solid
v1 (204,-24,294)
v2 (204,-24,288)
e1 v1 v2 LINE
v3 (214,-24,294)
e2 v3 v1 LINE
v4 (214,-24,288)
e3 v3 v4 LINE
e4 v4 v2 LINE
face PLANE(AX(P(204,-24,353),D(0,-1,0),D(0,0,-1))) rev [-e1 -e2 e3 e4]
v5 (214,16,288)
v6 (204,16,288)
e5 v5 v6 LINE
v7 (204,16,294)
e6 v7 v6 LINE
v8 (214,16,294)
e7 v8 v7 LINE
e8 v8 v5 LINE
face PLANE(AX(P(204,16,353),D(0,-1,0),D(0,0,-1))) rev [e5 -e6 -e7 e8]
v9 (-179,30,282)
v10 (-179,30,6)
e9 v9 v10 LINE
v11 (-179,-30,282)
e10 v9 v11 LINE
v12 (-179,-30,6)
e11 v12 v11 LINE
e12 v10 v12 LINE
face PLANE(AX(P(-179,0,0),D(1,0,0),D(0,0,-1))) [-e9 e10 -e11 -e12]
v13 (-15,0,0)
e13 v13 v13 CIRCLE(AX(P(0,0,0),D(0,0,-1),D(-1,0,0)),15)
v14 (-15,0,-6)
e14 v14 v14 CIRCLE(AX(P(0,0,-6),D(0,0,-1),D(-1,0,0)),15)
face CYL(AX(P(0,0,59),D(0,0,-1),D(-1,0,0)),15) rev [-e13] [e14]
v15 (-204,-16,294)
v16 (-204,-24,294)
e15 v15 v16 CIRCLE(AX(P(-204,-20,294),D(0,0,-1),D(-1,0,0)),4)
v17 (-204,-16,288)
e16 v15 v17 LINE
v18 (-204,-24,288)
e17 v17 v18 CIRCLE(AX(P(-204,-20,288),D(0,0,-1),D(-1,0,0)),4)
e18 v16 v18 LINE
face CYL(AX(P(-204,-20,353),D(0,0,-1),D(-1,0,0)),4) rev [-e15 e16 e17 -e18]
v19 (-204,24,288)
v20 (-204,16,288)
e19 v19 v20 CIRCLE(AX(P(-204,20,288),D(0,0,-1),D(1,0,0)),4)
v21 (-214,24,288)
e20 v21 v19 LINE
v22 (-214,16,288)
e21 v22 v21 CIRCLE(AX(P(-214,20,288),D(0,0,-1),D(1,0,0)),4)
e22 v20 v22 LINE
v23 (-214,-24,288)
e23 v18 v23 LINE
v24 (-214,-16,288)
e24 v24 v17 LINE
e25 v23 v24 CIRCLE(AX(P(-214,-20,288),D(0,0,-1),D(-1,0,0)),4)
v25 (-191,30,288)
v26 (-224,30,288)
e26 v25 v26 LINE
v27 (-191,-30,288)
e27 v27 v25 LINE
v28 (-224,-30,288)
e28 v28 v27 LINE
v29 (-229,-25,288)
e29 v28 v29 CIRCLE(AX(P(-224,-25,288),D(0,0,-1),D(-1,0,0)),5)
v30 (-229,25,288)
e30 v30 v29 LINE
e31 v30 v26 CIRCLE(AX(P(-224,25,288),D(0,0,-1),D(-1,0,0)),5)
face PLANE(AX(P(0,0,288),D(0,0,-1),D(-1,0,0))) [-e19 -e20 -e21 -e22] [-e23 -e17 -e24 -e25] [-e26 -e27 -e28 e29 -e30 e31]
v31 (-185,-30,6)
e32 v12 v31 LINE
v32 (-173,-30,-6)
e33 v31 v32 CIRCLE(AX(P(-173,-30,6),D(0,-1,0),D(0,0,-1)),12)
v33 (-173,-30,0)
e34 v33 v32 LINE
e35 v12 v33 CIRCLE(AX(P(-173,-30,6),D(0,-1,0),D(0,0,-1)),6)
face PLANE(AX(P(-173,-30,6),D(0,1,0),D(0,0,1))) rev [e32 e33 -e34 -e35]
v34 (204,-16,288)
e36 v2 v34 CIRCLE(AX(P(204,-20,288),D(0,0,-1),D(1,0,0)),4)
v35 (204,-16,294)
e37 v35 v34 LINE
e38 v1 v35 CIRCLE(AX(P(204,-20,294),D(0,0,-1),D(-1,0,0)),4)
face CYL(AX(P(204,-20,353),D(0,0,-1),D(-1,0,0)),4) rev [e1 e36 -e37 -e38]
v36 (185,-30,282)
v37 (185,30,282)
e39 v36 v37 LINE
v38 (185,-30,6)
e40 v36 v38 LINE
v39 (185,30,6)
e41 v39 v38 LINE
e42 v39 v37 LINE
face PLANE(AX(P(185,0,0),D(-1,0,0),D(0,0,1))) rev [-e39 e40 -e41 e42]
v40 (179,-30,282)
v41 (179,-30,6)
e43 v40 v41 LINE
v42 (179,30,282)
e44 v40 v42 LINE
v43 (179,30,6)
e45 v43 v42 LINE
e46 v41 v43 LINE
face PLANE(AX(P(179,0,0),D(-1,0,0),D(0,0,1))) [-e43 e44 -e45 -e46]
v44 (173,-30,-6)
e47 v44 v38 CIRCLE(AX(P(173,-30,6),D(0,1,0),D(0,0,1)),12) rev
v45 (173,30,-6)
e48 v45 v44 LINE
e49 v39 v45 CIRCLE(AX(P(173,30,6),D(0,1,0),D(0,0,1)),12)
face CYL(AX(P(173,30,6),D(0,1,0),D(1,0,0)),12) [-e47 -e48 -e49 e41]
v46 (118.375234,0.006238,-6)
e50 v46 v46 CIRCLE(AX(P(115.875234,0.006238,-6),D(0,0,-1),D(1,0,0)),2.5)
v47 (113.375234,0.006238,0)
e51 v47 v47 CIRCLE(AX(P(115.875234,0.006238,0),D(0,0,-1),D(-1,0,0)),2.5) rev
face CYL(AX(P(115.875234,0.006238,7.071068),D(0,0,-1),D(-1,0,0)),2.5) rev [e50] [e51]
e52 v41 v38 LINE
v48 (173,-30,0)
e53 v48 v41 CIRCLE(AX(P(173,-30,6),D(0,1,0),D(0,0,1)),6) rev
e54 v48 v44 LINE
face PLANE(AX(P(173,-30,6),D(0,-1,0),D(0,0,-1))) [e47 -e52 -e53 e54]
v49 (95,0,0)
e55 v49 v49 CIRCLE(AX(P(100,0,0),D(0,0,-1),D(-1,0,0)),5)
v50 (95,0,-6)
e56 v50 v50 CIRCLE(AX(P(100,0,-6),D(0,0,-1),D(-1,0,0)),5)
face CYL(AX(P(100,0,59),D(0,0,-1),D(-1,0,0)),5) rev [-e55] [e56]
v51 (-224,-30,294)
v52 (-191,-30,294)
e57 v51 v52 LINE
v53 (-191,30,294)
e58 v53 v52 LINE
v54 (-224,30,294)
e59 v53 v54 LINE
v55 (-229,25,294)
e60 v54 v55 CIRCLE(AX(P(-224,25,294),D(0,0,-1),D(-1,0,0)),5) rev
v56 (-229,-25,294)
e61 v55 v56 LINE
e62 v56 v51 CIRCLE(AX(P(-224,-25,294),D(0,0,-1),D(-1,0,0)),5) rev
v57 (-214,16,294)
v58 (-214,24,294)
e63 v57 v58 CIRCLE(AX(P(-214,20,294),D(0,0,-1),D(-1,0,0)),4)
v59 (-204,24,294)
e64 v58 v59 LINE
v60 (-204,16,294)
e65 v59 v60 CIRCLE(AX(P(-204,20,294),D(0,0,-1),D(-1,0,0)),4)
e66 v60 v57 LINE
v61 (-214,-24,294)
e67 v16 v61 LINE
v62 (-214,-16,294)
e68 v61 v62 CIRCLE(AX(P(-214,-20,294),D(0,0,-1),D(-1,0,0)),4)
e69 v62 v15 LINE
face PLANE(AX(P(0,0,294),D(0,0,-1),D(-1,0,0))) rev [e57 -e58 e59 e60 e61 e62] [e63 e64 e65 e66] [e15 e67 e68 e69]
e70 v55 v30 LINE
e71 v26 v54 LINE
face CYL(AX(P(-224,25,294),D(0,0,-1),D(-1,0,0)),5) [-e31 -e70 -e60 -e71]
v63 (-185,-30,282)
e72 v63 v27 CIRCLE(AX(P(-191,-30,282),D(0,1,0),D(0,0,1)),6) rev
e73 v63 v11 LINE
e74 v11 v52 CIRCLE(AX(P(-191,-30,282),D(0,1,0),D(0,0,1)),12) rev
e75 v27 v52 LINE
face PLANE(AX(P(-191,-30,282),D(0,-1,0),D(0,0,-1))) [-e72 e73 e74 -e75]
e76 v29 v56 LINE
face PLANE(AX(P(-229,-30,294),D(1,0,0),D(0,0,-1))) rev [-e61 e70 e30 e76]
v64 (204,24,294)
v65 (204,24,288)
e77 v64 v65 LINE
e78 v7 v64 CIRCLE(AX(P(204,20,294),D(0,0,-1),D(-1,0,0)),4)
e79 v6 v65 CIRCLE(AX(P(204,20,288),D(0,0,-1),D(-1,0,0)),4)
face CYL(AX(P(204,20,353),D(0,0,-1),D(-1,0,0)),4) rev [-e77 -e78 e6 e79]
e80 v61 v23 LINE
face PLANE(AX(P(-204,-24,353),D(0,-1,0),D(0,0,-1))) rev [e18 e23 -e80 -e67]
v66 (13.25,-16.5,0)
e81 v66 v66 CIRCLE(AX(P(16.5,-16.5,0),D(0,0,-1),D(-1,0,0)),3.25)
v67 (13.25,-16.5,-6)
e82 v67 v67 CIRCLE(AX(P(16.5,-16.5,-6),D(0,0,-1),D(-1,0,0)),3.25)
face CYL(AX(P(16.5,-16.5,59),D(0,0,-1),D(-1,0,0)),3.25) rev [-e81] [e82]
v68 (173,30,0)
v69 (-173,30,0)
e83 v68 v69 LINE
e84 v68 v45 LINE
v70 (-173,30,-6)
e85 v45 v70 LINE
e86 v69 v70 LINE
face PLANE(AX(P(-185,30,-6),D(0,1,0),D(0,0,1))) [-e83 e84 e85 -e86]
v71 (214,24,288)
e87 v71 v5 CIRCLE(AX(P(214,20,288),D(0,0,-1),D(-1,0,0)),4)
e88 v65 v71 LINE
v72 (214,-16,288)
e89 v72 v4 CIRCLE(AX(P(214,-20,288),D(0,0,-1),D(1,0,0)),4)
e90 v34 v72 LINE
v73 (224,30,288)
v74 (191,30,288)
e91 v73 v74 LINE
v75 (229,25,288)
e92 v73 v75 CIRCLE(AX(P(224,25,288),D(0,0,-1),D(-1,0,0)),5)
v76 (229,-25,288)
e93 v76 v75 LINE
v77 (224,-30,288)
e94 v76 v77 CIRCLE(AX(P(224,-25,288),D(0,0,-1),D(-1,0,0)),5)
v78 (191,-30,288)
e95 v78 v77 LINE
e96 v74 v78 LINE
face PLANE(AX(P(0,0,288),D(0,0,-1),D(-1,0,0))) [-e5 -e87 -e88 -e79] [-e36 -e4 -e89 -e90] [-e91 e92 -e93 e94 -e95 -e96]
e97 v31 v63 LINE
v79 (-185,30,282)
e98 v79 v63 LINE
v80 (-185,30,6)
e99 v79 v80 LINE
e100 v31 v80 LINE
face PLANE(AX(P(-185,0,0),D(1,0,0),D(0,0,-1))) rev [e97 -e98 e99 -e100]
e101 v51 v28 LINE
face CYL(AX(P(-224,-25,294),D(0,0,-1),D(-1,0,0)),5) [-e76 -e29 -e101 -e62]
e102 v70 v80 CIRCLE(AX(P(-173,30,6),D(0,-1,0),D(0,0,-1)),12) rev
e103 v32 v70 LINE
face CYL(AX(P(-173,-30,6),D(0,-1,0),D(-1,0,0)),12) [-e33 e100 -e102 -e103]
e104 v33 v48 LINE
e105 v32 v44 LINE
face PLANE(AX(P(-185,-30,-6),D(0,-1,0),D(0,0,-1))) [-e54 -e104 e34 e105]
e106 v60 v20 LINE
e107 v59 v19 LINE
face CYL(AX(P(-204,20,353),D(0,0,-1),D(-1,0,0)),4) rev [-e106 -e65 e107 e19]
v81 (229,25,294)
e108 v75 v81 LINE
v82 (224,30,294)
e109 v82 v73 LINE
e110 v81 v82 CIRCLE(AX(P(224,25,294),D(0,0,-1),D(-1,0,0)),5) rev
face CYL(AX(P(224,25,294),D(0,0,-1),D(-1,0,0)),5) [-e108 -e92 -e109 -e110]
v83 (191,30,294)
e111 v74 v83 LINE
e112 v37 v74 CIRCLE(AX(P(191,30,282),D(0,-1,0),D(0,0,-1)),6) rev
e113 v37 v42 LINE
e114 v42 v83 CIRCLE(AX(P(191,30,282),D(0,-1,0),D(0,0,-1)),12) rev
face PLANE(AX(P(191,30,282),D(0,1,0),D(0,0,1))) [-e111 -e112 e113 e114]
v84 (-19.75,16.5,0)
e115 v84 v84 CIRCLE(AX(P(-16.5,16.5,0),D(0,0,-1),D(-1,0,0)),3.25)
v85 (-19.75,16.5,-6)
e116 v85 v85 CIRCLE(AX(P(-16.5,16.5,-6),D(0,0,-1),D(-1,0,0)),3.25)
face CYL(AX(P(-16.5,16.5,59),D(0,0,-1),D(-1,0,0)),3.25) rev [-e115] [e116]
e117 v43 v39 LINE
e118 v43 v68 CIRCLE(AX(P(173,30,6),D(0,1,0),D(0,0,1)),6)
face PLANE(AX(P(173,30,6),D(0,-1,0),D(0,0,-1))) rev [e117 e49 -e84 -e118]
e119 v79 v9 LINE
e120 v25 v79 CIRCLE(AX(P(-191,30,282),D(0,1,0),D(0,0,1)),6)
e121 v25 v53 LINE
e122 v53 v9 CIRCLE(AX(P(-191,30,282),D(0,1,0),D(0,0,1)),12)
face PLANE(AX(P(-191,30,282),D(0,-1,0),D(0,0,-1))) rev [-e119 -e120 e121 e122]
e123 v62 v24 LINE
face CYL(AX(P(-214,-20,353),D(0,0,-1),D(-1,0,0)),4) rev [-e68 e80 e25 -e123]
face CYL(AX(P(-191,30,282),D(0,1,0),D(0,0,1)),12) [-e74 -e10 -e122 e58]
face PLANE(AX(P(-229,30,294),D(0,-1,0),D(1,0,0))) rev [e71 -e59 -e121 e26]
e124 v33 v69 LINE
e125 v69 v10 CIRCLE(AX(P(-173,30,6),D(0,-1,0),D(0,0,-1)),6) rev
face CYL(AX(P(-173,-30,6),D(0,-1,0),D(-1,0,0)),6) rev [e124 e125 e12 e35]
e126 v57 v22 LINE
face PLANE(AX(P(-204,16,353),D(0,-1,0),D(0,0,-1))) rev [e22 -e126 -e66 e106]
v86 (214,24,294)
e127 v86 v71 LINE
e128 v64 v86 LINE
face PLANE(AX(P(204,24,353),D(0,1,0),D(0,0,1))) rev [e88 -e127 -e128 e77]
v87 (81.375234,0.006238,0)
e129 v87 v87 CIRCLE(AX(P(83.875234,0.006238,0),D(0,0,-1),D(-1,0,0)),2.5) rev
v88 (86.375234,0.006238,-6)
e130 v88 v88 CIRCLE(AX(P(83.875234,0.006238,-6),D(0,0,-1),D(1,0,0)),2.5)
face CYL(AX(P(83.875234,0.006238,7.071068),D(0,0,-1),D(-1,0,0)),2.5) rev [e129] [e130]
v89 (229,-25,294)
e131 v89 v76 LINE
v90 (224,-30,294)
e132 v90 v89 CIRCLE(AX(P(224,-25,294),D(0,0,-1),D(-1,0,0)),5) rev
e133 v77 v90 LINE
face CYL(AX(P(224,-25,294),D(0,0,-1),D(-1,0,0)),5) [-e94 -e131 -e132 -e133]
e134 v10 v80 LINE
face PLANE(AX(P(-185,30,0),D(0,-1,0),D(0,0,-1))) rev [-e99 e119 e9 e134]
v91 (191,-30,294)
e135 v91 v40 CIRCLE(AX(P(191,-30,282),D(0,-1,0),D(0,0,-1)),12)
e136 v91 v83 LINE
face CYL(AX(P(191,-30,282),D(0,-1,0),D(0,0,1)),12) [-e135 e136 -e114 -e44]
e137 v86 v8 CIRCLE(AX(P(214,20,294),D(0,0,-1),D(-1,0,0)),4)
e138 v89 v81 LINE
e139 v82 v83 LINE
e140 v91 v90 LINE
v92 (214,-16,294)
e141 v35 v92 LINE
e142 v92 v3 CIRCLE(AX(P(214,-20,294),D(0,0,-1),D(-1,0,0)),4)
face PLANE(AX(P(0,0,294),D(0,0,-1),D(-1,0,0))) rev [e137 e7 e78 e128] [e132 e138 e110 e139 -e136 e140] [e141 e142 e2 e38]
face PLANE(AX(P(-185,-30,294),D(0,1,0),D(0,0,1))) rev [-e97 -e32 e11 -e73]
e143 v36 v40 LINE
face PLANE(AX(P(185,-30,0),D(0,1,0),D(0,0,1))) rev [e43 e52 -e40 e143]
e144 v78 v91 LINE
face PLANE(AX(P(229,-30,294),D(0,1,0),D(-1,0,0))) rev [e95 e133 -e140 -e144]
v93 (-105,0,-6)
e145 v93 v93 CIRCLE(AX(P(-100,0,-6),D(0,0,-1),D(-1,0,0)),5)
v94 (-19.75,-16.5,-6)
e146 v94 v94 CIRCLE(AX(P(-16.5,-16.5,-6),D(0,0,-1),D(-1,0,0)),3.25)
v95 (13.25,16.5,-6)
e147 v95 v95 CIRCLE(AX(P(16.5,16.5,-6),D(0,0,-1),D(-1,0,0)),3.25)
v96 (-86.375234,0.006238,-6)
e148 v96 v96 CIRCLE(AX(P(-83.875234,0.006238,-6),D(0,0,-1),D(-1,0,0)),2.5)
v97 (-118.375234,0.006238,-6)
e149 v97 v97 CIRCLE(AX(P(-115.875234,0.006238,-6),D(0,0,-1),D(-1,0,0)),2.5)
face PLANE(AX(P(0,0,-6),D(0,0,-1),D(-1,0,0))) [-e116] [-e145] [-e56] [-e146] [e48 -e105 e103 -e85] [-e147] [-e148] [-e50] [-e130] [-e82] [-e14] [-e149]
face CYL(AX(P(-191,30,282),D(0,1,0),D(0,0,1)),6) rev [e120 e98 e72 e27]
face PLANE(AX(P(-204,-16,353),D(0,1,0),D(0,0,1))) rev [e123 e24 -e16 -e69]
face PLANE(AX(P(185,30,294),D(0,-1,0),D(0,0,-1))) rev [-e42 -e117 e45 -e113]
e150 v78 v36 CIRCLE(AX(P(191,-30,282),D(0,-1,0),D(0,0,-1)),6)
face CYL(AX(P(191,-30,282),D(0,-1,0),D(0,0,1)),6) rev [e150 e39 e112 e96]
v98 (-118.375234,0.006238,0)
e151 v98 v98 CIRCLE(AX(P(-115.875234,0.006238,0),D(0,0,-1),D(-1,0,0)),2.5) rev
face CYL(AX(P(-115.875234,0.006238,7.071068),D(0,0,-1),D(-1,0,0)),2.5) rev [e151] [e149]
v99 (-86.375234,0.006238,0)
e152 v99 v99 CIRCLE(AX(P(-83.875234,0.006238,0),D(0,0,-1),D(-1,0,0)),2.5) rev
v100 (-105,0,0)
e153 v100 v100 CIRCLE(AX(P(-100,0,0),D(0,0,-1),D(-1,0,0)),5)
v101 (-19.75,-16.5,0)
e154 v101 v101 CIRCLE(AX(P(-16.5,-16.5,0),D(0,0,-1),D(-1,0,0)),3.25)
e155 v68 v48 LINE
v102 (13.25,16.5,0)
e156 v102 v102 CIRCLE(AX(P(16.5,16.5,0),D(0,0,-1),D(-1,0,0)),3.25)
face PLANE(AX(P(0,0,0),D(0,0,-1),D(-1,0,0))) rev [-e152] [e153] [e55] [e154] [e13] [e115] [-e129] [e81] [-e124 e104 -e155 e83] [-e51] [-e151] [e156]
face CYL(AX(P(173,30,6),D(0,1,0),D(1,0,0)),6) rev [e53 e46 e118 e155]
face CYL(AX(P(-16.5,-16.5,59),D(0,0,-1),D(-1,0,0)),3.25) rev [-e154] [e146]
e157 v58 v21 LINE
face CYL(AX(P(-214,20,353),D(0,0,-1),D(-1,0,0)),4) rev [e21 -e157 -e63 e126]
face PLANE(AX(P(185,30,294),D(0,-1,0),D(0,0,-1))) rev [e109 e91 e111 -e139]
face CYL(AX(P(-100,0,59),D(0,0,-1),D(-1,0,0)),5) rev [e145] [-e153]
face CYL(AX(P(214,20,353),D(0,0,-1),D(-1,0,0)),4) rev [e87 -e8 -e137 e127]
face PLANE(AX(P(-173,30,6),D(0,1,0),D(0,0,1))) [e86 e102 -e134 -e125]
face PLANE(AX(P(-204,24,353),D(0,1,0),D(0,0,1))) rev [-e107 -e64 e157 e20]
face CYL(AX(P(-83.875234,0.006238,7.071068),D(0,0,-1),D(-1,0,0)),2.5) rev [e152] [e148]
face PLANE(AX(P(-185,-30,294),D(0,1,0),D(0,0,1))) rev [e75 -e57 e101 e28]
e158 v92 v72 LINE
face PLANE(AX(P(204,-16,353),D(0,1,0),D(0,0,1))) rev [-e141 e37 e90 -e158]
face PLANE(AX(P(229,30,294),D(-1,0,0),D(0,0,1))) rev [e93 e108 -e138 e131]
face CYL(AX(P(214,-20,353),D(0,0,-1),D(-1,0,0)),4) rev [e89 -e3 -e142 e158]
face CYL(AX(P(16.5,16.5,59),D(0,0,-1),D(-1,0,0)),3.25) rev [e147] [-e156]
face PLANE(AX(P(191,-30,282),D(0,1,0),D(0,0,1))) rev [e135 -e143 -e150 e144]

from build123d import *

# Parameters (mm, degrees)
SKETCH1_W                    = 370
SKETCH1_H                    = 60
BASE_FLANGE1_DEPTH           = 6
EDGE_FLANGE1_STRIP_W         = 36
EDGE_FLANGE1_STRIP_H         = 6
EDGE_FLANGE1_STRIP_CUT_DEPTH = 60
EDGE_FLANGE1_DEPTH           = 60
EDGE_FLANGE2_STRIP_W         = 36
EDGE_FLANGE2_STRIP_H         = 6
EDGE_FLANGE2_STRIP_CUT_DEPTH = 60
EDGE_FLANGE2_DEPTH           = 60
EDGE_FLANGE3_STRIP_W         = 36
EDGE_FLANGE3_STRIP_H         = 6
EDGE_FLANGE3_STRIP_CUT_DEPTH = 60
EDGE_FLANGE3_DEPTH           = 60
EDGE_FLANGE4_STRIP_W         = 36
EDGE_FLANGE4_STRIP_H         = 6
EDGE_FLANGE4_STRIP_CUT_DEPTH = 60
EDGE_FLANGE4_DEPTH           = 60
SKETCH18_R                   = 15
SKETCH18_R_2                 = 5
SKETCH18_R_3                 = 3.25
CUT_EXTRUDE1_DEPTH           = 65
CUT_EXTRUDE2_DEPTH           = 65
SKETCH23_R                   = 2.5
CUT_EXTRUDE3_DEPTH           = 6
FILLET1_R                    = 5


# Sheet-metal steps are written as plain solids
with BuildPart() as part:
    # Sketch1 → Base-Flange1 (new body)
    with BuildSketch(Plane.XY):
        Rectangle(SKETCH1_W, SKETCH1_H)
    extrude(amount=-BASE_FLANGE1_DEPTH)

    # Edge-Flange1 strip (across the edge) → Edge-Flange1 strip cut (cut)
    with BuildSketch(Plane(origin=(185, -30, 0), x_dir=(-1, 0, 0), z_dir=(0, 1, 0))):
        with Locations((-6, -3)):
            Rectangle(EDGE_FLANGE1_STRIP_W, EDGE_FLANGE1_STRIP_H)
    extrude(amount=EDGE_FLANGE1_STRIP_CUT_DEPTH, mode=Mode.SUBTRACT)

    # Edge-Flange1 section (across the edge) → Edge-Flange1 (add)
    with BuildSketch(Plane(origin=(185, -30, 0), x_dir=(-1, 0, 0), z_dir=(0, 1, 0))):
        with BuildLine():
            Line((0, 6), (0, 294))
            Line((0, 294), (6, 294))
            Line((6, 294), (6, 6))
            ThreePointArc((6, 6), (7.757359313, 1.757359313), (12, 0))
            Line((12, 0), (12, -6))
            ThreePointArc((12, -6), (3.514718626, -2.485281374), (0, 6))
        make_face()
    extrude(amount=EDGE_FLANGE1_DEPTH)

    # Edge-Flange2 strip (across the edge) → Edge-Flange2 strip cut (cut)
    with BuildSketch(Plane(origin=(-185, 30, 0), x_dir=(1, 0, 0), z_dir=(0, -1, 0))):
        with Locations((-6, -3)):
            Rectangle(EDGE_FLANGE2_STRIP_W, EDGE_FLANGE2_STRIP_H)
    extrude(amount=EDGE_FLANGE2_STRIP_CUT_DEPTH, mode=Mode.SUBTRACT)

    # Edge-Flange2 section (across the edge) → Edge-Flange2 (add)
    with BuildSketch(Plane(origin=(-185, 30, 0), x_dir=(1, 0, 0), z_dir=(0, -1, 0))):
        with BuildLine():
            Line((0, 6), (0, 294))
            Line((0, 294), (6, 294))
            Line((6, 294), (6, 6))
            ThreePointArc((6, 6), (7.757359313, 1.757359313), (12, 0))
            Line((12, 0), (12, -6))
            ThreePointArc((12, -6), (3.514718626, -2.485281374), (0, 6))
        make_face()
    extrude(amount=EDGE_FLANGE2_DEPTH)

    # Edge-Flange3 strip (across the edge) → Edge-Flange3 strip cut (cut)
    with BuildSketch(Plane(origin=(185, 30, 294), x_dir=(0, 0, -1), z_dir=(0, -1, 0))):
        with Locations((-6, -3)):
            Rectangle(EDGE_FLANGE3_STRIP_W, EDGE_FLANGE3_STRIP_H)
    extrude(amount=EDGE_FLANGE3_STRIP_CUT_DEPTH, mode=Mode.SUBTRACT)

    # Edge-Flange3 section (across the edge) → Edge-Flange3 (add)
    with BuildSketch(Plane(origin=(185, 30, 294), x_dir=(0, 0, -1), z_dir=(0, -1, 0))):
        with BuildLine():
            Line((0, 6), (0, 44))
            Line((0, 44), (6, 44))
            Line((6, 44), (6, 6))
            ThreePointArc((6, 6), (7.757359313, 1.757359313), (12, 0))
            Line((12, 0), (12, -6))
            ThreePointArc((12, -6), (3.514718626, -2.485281374), (0, 6))
        make_face()
    extrude(amount=EDGE_FLANGE3_DEPTH)

    # Edge-Flange4 strip (across the edge) → Edge-Flange4 strip cut (cut)
    with BuildSketch(Plane(origin=(-185, -30, 294), x_dir=(0, 0, -1), z_dir=(0, 1, 0))):
        with Locations((-6, -3)):
            Rectangle(EDGE_FLANGE4_STRIP_W, EDGE_FLANGE4_STRIP_H)
    extrude(amount=EDGE_FLANGE4_STRIP_CUT_DEPTH, mode=Mode.SUBTRACT)

    # Edge-Flange4 section (across the edge) → Edge-Flange4 (add)
    with BuildSketch(Plane(origin=(-185, -30, 294), x_dir=(0, 0, -1), z_dir=(0, 1, 0))):
        with BuildLine():
            Line((0, 6), (0, 44))
            Line((0, 44), (6, 44))
            Line((6, 44), (6, 6))
            ThreePointArc((6, 6), (7.757359313, 1.757359313), (12, 0))
            Line((12, 0), (12, -6))
            ThreePointArc((12, -6), (3.514718626, -2.485281374), (0, 6))
        make_face()
    extrude(amount=EDGE_FLANGE4_DEPTH)

    # Sketch18 → Cut-Extrude1 (cut)
    with BuildSketch(Plane(origin=(0, 0, -6), x_dir=(-1, 0, 0), z_dir=(0, 0, -1))):
        Circle(SKETCH18_R)
        with Locations((-100, 0)):
            Circle(SKETCH18_R_2)
        with Locations((100, 0)):
            Circle(SKETCH18_R_2)
        with Locations((-16.5, 16.5)):
            Circle(SKETCH18_R_3)
        with Locations((16.5, 16.5)):
            Circle(SKETCH18_R_3)
        with Locations((16.5, -16.5)):
            Circle(SKETCH18_R_3)
        with Locations((-16.5, -16.5)):
            Circle(SKETCH18_R_3)
    extrude(amount=-CUT_EXTRUDE1_DEPTH, mode=Mode.SUBTRACT)

    # Sketch22 → Cut-Extrude2 (cut)
    with BuildSketch(Plane(origin=(0, 0, 288), x_dir=(-1, 0, 0), z_dir=(0, 0, -1))):
        with BuildLine():
            Line((-204, 16), (-214, 16))
            ThreePointArc((-214, 16), (-218, 20), (-214, 24))
            Line((-214, 24), (-204, 24))
            ThreePointArc((-204, 24), (-200, 20), (-204, 16))
        make_face()
        with BuildLine():
            Line((-204, -16), (-214, -16))
            ThreePointArc((-214, -16), (-218, -20), (-214, -24))
            Line((-214, -24), (-204, -24))
            ThreePointArc((-204, -24), (-200, -20), (-204, -16))
        make_face()
        with BuildLine():
            Line((204, 16), (214, 16))
            ThreePointArc((214, 16), (218, 20), (214, 24))
            Line((214, 24), (204, 24))
            ThreePointArc((204, 24), (200, 20), (204, 16))
        make_face()
        with BuildLine():
            Line((204, -16), (214, -16))
            ThreePointArc((214, -16), (218, -20), (214, -24))
            Line((214, -24), (204, -24))
            ThreePointArc((204, -24), (200, -20), (204, -16))
        make_face()
    extrude(amount=-CUT_EXTRUDE2_DEPTH, mode=Mode.SUBTRACT)

    # Sketch23 → Cut-Extrude3 (cut)
    with BuildSketch(Plane(origin=(0, 0, -6), x_dir=(-1, 0, 0), z_dir=(0, 0, -1))):
        with Locations((115.875233888, 0.006238306)):
            Circle(SKETCH23_R)
        with Locations((83.875233888, 0.006238306)):
            Circle(SKETCH23_R)
        with Locations((-115.875233888, 0.006238306)):
            Circle(SKETCH23_R)
        with Locations((-83.875233888, 0.006238306)):
            Circle(SKETCH23_R)
    extrude(amount=-CUT_EXTRUDE3_DEPTH, mode=Mode.SUBTRACT)

    # Fillet1
    fillet1_edges = [part.edges().sort_by_distance(p)[0] for p in [
        (229, 30, 291),
        (229, -30, 291),
        (-229, -30, 291),
        (-229, 30, 291),
    ]]
    fillet(fillet1_edges, radius=FILLET1_R)


solid = part.part
